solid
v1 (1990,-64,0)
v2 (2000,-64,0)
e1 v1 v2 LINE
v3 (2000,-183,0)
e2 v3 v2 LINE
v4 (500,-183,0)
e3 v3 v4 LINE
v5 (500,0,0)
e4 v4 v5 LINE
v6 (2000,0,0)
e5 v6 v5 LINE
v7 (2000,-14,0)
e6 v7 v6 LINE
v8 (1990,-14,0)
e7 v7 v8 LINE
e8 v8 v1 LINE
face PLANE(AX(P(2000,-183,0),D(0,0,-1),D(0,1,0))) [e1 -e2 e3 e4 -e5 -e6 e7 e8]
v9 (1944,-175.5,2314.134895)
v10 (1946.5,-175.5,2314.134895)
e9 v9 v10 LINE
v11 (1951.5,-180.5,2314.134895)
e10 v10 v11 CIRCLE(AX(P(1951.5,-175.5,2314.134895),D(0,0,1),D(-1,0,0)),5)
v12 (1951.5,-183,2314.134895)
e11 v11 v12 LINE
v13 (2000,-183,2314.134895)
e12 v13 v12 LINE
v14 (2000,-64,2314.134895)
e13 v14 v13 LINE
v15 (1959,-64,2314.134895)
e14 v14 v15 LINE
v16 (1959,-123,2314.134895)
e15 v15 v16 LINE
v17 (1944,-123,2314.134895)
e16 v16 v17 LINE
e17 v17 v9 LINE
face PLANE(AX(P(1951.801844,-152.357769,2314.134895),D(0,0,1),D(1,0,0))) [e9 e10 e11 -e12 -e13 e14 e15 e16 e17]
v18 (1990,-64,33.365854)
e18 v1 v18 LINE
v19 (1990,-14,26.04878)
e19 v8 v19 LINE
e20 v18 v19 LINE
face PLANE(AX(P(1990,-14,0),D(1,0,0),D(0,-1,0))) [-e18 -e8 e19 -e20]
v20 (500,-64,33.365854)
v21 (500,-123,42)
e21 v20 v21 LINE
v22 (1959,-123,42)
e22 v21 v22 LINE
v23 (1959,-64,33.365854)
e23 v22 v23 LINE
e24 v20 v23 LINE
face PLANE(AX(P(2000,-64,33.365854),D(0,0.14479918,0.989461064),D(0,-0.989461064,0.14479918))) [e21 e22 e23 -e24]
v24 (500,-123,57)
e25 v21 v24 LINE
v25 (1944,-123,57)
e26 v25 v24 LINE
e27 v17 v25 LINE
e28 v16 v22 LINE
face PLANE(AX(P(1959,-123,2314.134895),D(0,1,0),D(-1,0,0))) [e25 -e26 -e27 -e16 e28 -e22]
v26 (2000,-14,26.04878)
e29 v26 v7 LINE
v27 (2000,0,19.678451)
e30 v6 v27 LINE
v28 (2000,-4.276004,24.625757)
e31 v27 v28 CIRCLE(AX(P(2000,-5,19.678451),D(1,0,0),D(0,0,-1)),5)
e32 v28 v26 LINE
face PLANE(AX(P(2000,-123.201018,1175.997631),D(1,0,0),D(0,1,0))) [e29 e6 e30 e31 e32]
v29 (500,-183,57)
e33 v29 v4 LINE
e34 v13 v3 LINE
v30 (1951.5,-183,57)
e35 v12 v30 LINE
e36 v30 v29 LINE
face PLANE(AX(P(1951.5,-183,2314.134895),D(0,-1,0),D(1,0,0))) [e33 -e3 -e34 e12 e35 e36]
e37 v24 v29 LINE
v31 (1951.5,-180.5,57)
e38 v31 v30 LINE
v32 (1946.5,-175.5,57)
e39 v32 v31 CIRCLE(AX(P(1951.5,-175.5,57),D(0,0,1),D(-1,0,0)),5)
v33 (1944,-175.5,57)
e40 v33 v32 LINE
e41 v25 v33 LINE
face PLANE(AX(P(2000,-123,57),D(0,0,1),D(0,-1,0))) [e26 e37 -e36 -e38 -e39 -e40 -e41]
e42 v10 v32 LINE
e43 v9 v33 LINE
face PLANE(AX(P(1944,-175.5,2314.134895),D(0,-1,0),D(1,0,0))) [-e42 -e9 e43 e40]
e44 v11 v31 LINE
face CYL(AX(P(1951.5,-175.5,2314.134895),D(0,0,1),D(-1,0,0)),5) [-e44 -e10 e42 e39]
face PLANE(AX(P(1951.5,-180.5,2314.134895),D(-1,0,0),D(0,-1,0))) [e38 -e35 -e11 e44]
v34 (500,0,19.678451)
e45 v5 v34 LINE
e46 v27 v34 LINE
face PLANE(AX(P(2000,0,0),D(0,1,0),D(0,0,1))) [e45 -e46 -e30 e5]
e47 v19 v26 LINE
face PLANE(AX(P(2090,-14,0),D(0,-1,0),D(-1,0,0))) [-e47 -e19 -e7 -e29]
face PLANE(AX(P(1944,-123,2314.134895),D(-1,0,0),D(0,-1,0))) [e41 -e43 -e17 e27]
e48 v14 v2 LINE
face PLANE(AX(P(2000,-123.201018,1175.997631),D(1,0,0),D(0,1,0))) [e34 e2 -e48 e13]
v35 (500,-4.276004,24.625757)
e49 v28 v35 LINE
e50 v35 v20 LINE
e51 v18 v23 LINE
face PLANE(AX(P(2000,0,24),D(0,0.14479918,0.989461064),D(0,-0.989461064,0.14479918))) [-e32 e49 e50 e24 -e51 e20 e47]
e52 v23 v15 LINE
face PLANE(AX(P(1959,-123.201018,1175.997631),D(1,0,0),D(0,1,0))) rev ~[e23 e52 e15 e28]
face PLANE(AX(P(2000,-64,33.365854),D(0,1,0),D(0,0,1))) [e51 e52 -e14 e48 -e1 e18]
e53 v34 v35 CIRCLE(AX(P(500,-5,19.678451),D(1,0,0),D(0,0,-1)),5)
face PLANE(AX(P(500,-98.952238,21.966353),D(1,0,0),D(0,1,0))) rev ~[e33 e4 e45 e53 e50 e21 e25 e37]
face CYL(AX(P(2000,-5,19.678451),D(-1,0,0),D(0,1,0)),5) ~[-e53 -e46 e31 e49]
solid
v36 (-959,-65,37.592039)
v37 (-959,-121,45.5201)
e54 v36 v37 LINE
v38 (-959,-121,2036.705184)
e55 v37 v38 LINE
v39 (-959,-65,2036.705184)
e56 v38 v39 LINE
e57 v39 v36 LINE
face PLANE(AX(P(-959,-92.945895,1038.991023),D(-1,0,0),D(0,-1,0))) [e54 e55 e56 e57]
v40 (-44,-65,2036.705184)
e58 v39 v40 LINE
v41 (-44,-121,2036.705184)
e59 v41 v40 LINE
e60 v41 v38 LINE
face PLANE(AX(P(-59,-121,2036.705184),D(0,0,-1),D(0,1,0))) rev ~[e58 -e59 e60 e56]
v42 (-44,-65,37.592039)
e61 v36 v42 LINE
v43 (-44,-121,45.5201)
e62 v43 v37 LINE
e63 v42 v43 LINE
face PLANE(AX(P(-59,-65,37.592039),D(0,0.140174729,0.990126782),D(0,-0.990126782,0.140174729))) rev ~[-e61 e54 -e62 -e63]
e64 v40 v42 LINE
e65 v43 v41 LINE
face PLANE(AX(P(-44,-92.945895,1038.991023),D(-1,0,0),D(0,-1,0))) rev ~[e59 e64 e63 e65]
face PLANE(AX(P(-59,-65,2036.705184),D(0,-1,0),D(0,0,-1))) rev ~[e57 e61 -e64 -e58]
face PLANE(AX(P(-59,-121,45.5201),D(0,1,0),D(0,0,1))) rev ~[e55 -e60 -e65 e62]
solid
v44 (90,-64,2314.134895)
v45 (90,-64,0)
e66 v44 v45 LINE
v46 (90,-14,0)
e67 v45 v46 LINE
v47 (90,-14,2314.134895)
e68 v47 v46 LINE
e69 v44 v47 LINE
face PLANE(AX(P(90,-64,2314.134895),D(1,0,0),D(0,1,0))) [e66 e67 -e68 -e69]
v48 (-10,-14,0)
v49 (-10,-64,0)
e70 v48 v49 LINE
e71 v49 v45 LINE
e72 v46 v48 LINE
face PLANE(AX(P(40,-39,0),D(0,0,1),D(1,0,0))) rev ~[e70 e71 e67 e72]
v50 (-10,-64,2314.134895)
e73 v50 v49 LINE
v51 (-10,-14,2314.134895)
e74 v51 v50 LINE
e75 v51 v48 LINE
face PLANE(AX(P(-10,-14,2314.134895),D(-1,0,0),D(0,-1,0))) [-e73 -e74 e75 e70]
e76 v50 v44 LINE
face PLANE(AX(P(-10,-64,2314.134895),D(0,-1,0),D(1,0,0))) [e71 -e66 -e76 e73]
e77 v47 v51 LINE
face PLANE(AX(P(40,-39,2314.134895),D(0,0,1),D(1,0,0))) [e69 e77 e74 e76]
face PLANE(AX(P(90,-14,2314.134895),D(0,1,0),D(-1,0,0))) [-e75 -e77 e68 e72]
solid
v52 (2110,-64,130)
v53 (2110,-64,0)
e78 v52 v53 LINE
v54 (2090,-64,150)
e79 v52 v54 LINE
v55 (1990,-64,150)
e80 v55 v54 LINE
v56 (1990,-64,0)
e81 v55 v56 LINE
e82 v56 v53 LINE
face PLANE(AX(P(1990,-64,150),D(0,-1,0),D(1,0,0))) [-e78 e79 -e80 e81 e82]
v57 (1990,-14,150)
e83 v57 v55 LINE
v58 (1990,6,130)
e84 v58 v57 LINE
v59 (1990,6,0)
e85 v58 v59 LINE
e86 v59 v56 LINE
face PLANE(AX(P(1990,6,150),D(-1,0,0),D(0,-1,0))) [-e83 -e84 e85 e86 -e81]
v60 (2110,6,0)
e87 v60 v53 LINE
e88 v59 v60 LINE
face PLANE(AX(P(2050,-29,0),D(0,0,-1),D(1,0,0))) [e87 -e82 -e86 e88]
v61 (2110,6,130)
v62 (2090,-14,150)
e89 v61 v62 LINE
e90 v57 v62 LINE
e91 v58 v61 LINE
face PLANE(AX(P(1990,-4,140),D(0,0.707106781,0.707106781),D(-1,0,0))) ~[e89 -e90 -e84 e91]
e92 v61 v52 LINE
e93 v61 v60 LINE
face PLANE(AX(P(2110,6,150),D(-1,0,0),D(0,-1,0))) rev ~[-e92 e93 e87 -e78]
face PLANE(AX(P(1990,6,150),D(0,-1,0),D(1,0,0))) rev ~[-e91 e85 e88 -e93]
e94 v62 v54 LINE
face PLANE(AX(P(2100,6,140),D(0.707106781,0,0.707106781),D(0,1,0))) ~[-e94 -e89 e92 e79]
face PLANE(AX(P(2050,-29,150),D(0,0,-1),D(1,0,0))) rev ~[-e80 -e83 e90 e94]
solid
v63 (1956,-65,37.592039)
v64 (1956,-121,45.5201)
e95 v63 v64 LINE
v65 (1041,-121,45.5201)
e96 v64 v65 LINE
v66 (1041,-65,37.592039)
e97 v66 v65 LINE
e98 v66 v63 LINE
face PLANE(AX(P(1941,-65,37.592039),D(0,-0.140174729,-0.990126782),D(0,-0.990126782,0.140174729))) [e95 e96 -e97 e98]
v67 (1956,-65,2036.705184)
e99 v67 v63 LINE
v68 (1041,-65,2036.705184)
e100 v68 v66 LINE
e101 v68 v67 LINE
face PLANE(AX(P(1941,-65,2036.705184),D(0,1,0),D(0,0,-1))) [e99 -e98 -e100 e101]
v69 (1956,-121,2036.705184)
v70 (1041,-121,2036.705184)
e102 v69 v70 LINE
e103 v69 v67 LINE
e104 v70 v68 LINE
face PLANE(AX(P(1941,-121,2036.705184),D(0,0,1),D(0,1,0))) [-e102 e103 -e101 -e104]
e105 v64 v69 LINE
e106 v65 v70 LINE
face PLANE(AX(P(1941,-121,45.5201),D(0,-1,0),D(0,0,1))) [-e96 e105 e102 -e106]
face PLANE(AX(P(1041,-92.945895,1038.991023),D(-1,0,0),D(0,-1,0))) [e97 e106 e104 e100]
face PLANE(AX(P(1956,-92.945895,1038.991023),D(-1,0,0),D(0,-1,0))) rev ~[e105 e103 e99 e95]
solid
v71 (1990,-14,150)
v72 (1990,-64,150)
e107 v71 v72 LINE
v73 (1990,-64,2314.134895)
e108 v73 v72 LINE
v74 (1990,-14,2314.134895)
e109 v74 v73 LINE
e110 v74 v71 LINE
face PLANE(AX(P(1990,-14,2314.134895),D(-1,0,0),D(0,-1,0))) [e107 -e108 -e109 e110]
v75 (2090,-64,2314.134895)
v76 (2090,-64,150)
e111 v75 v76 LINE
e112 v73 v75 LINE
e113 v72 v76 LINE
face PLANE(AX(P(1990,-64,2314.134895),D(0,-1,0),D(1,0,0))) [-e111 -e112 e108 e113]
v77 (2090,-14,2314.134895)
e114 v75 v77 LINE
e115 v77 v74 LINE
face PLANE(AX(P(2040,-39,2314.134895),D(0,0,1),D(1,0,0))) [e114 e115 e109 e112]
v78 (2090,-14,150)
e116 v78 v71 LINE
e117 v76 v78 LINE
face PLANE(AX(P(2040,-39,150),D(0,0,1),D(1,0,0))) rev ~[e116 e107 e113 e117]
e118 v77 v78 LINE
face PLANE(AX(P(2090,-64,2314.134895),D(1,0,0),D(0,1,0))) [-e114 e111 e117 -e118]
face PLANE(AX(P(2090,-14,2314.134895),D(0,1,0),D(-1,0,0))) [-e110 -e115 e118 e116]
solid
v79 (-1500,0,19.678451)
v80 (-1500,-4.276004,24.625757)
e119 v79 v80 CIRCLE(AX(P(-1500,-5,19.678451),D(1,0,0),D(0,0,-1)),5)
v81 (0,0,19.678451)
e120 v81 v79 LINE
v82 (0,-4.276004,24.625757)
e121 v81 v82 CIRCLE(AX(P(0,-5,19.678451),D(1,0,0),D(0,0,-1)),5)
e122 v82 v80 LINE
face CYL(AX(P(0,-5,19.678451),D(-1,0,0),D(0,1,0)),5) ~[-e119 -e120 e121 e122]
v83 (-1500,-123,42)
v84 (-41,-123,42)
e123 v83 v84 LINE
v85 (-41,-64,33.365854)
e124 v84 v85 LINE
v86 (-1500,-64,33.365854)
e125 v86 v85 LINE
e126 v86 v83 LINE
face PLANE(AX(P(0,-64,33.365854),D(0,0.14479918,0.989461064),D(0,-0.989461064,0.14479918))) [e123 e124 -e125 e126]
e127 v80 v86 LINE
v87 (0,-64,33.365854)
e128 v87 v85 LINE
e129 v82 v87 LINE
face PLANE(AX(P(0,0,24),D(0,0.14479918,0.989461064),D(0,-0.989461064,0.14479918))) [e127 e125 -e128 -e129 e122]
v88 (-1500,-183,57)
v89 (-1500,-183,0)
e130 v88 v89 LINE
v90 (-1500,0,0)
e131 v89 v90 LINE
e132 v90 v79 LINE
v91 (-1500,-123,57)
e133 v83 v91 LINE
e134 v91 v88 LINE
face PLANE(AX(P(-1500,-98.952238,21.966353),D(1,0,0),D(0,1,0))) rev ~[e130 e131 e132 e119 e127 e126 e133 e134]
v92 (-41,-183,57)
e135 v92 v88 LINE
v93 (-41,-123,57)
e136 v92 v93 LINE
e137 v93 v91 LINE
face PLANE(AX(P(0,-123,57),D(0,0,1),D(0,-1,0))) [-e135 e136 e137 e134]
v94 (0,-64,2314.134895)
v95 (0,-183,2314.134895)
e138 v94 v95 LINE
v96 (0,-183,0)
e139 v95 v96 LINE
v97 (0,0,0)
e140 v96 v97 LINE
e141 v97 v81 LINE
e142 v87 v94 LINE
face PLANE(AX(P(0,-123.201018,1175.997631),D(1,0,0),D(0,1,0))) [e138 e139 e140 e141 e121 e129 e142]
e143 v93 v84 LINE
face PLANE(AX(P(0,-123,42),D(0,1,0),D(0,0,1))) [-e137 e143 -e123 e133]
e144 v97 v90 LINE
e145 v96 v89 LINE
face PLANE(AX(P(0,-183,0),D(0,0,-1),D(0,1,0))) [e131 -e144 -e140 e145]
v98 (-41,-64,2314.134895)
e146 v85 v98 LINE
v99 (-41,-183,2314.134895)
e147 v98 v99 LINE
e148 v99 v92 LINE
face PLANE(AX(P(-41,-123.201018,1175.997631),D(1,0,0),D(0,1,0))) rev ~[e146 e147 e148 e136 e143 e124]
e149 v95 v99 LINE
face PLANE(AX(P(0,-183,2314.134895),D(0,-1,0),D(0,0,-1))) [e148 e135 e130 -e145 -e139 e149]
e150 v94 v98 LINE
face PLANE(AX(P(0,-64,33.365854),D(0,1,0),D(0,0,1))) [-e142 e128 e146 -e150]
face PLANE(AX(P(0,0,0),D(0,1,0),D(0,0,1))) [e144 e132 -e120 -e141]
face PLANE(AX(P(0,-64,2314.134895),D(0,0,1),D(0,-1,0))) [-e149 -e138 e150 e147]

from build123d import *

# Parameters (mm, degrees)
F1_DEPTH  = 1500
F2_DEPTH  = 56
F4_DEPTH  = 3
F5_DEPTH  = 900
F7_DEPTH  = 2314.1348951653
F9_DEPTH  = 150
F10_W     = 120
F10_H     = 70
F11_DEPTH = 150
F12_SIZE  = 20
F13_R     = 5
F13_2_R   = 5
F14_DEPTH = 15
F15_DEPTH = 15
F16_DEPTH = 15
F17_DEPTH = 15
F19_DEPTH = 2257.1348951653


# Not quite as in the source:
# - a feature of the source that left no trace in its solid (it failed there, or was rolled back) is left out


with BuildPart() as f1:
    # F0 (on Right) → F1 (new body)
    with BuildSketch(Plane.YZ):
        Polygon((-183, 0), (0, 0), (0, 24), (-64, 33.3658536585), (-123, 42), (-123, 57), (-183, 57), align=None)
    extrude(amount=-F1_DEPTH)

    # F0 (on Right) → F2 (join)
    with BuildSketch(Plane.YZ):
        Polygon((-183, 161.9052439928), (-183, 57), (-123, 57), (-123, 42), (-64, 33.3658536585), (-64, 167.0590639114), (-64, 2314.1348951653), (-183, 2314.1348951653), align=None)
        Polygon((-65, 2037.5547998742), (-65, 37.5547998742), (-121, 45.7499218254), (-121, 2037.5547998742), align=None, mode=Mode.SUBTRACT)
        Polygon((-121, 45.7499218254), (-65, 37.5547998742), (-65, 2037.5547998742), (-121, 2037.5547998742), align=None)
    extrude(amount=-F2_DEPTH)


with BuildPart() as f4:
    # F3 (on face) → F4 (new body)
    with BuildSketch(Plane(origin=(-56, 0, 0), x_dir=(0, -1, 0), z_dir=(-1, 0, 0))):
        Polygon((65, 37.5920394199), (121, 45.5200997288), (121, 2036.7051838202), (65, 2036.7051838202), align=None)
    extrude(amount=F4_DEPTH)


with BuildPart() as f5:
    # F5 (new): a face of the model
    f5_faces = [f4.part.faces().sort_by_distance(p)[0] for p in [
        (-59, -92.9814562157, 1039.1293140523),
    ]]
    extrude(f5_faces, amount=F5_DEPTH)


with BuildPart() as f7:
    # F6 (on face) → F7 (new body, through all)
    with BuildSketch(Plane.XY.offset(2314.1348951653)):
        Polygon((-10, -14), (-10, -64), (0, -64), (90, -64), (90, -14), align=None)
    extrude(amount=-F7_DEPTH)


with BuildPart() as f8_1:
    # F8: copy of F7
    add(f7.part.moved(Location((2000, 0, 0))))


with BuildPart() as f8_2:
    # F8: copy of F1
    add(f1.part.moved(Location((2000, 0, 0))))


with BuildPart() as f8_3:
    # F8: copy of F5
    add(f5.part.moved(Location((2000, 0, 0))))

    # F17 (add): a face of the model
    f17_faces = [f8_3.faces().sort_by_distance(p)[0] for p in [
        (1941, -92.9814562157, 1039.1293140523),
    ]]
    extrude(f17_faces, amount=F17_DEPTH)


with BuildPart() as f9_tool:
    # F9 (cut): a face of the model
    f9_faces = [f8_1.part.faces().sort_by_distance(p)[0] for p in [
        (2040, -39, 0),
    ]]
    extrude(f9_faces, amount=-F9_DEPTH)


with BuildPart() as f8_1_1:
    add(f8_1.part)

    # F9: cut by f9_tool
    add(f9_tool.part, mode=Mode.SUBTRACT)


with BuildPart() as f8_2_1:
    add(f8_2.part)

    # F9: cut by f9_tool
    add(f9_tool.part, mode=Mode.SUBTRACT)

    # F13#2
    f13_2_edges = [f8_2_1.edges().sort_by_distance(p)[0] for p in [
        (1250, 0, 24),
    ]]
    fillet(f13_2_edges, radius=F13_2_R)

    # F16 (cut): a face of the model
    f16_faces = [f8_2_1.faces().sort_by_distance(p)[0] for p in [
        (1944, -123.3639578476, 1180.7575057396),
    ]]
    extrude(f16_faces, amount=-F16_DEPTH, mode=Mode.SUBTRACT)

    # F18 (on face) → F19 (join, through all)
    with BuildSketch(Plane.XY.offset(2314.1348951653)):
        with BuildLine():
            Line((1951.5, -183), (1959, -183))
            Line((1959, -183), (1959, -123))
            Line((1959, -123), (1944, -123))
            Line((1944, -123), (1944, -175.5))
            Line((1944, -175.5), (1946.5, -175.5))
            ThreePointArc((1946.5, -175.5), (1947.9644660941, -179.0355339059), (1951.5, -180.5))
            Line((1951.5, -180.5), (1951.5, -183))
        make_face()
    extrude(amount=-F19_DEPTH)


with BuildPart() as f11:
    # F10 (on face) → F11 (new body)
    with BuildSketch(Plane(origin=(0, 0, 150), x_dir=(1, 0, 0), z_dir=(0, 0, -1))):
        with Locations((2050, 29)):
            Rectangle(F10_W, F10_H)
    extrude(amount=F11_DEPTH)

    # F12
    f12_edges = [f11.edges().sort_by_distance(p)[0] for p in [
        (2050, 6, 150),
        (2110, -29, 150),
    ]]
    chamfer(f12_edges, length=F12_SIZE)


with BuildPart() as f1_1:
    add(f1.part)

    # F13
    f13_edges = [f1_1.edges().sort_by_distance(p)[0] for p in [
        (-750, 0, 24),
    ]]
    fillet(f13_edges, radius=F13_R)

    # F14 (cut): a face of the model
    f14_faces = [f1_1.faces().sort_by_distance(p)[0] for p in [
        (-56, -123.3639578476, 1180.7575057396),
    ]]
    extrude(f14_faces, amount=-F14_DEPTH, mode=Mode.SUBTRACT)


with BuildPart() as f4_1:
    add(f4.part)

    # F15 (add): a face of the model
    f15_faces = [f5.part.faces().sort_by_distance(p)[0] for p in [
        (-59, -92.9814562157, 1039.1293140523),
    ]]

    add(f5.part)  # F15 merges F5
    extrude(f15_faces, amount=F15_DEPTH)


solid = Compound([f7.part, f8_3.part, f8_1_1.part, f8_2_1.part, f11.part, f1_1.part, f4_1.part])
